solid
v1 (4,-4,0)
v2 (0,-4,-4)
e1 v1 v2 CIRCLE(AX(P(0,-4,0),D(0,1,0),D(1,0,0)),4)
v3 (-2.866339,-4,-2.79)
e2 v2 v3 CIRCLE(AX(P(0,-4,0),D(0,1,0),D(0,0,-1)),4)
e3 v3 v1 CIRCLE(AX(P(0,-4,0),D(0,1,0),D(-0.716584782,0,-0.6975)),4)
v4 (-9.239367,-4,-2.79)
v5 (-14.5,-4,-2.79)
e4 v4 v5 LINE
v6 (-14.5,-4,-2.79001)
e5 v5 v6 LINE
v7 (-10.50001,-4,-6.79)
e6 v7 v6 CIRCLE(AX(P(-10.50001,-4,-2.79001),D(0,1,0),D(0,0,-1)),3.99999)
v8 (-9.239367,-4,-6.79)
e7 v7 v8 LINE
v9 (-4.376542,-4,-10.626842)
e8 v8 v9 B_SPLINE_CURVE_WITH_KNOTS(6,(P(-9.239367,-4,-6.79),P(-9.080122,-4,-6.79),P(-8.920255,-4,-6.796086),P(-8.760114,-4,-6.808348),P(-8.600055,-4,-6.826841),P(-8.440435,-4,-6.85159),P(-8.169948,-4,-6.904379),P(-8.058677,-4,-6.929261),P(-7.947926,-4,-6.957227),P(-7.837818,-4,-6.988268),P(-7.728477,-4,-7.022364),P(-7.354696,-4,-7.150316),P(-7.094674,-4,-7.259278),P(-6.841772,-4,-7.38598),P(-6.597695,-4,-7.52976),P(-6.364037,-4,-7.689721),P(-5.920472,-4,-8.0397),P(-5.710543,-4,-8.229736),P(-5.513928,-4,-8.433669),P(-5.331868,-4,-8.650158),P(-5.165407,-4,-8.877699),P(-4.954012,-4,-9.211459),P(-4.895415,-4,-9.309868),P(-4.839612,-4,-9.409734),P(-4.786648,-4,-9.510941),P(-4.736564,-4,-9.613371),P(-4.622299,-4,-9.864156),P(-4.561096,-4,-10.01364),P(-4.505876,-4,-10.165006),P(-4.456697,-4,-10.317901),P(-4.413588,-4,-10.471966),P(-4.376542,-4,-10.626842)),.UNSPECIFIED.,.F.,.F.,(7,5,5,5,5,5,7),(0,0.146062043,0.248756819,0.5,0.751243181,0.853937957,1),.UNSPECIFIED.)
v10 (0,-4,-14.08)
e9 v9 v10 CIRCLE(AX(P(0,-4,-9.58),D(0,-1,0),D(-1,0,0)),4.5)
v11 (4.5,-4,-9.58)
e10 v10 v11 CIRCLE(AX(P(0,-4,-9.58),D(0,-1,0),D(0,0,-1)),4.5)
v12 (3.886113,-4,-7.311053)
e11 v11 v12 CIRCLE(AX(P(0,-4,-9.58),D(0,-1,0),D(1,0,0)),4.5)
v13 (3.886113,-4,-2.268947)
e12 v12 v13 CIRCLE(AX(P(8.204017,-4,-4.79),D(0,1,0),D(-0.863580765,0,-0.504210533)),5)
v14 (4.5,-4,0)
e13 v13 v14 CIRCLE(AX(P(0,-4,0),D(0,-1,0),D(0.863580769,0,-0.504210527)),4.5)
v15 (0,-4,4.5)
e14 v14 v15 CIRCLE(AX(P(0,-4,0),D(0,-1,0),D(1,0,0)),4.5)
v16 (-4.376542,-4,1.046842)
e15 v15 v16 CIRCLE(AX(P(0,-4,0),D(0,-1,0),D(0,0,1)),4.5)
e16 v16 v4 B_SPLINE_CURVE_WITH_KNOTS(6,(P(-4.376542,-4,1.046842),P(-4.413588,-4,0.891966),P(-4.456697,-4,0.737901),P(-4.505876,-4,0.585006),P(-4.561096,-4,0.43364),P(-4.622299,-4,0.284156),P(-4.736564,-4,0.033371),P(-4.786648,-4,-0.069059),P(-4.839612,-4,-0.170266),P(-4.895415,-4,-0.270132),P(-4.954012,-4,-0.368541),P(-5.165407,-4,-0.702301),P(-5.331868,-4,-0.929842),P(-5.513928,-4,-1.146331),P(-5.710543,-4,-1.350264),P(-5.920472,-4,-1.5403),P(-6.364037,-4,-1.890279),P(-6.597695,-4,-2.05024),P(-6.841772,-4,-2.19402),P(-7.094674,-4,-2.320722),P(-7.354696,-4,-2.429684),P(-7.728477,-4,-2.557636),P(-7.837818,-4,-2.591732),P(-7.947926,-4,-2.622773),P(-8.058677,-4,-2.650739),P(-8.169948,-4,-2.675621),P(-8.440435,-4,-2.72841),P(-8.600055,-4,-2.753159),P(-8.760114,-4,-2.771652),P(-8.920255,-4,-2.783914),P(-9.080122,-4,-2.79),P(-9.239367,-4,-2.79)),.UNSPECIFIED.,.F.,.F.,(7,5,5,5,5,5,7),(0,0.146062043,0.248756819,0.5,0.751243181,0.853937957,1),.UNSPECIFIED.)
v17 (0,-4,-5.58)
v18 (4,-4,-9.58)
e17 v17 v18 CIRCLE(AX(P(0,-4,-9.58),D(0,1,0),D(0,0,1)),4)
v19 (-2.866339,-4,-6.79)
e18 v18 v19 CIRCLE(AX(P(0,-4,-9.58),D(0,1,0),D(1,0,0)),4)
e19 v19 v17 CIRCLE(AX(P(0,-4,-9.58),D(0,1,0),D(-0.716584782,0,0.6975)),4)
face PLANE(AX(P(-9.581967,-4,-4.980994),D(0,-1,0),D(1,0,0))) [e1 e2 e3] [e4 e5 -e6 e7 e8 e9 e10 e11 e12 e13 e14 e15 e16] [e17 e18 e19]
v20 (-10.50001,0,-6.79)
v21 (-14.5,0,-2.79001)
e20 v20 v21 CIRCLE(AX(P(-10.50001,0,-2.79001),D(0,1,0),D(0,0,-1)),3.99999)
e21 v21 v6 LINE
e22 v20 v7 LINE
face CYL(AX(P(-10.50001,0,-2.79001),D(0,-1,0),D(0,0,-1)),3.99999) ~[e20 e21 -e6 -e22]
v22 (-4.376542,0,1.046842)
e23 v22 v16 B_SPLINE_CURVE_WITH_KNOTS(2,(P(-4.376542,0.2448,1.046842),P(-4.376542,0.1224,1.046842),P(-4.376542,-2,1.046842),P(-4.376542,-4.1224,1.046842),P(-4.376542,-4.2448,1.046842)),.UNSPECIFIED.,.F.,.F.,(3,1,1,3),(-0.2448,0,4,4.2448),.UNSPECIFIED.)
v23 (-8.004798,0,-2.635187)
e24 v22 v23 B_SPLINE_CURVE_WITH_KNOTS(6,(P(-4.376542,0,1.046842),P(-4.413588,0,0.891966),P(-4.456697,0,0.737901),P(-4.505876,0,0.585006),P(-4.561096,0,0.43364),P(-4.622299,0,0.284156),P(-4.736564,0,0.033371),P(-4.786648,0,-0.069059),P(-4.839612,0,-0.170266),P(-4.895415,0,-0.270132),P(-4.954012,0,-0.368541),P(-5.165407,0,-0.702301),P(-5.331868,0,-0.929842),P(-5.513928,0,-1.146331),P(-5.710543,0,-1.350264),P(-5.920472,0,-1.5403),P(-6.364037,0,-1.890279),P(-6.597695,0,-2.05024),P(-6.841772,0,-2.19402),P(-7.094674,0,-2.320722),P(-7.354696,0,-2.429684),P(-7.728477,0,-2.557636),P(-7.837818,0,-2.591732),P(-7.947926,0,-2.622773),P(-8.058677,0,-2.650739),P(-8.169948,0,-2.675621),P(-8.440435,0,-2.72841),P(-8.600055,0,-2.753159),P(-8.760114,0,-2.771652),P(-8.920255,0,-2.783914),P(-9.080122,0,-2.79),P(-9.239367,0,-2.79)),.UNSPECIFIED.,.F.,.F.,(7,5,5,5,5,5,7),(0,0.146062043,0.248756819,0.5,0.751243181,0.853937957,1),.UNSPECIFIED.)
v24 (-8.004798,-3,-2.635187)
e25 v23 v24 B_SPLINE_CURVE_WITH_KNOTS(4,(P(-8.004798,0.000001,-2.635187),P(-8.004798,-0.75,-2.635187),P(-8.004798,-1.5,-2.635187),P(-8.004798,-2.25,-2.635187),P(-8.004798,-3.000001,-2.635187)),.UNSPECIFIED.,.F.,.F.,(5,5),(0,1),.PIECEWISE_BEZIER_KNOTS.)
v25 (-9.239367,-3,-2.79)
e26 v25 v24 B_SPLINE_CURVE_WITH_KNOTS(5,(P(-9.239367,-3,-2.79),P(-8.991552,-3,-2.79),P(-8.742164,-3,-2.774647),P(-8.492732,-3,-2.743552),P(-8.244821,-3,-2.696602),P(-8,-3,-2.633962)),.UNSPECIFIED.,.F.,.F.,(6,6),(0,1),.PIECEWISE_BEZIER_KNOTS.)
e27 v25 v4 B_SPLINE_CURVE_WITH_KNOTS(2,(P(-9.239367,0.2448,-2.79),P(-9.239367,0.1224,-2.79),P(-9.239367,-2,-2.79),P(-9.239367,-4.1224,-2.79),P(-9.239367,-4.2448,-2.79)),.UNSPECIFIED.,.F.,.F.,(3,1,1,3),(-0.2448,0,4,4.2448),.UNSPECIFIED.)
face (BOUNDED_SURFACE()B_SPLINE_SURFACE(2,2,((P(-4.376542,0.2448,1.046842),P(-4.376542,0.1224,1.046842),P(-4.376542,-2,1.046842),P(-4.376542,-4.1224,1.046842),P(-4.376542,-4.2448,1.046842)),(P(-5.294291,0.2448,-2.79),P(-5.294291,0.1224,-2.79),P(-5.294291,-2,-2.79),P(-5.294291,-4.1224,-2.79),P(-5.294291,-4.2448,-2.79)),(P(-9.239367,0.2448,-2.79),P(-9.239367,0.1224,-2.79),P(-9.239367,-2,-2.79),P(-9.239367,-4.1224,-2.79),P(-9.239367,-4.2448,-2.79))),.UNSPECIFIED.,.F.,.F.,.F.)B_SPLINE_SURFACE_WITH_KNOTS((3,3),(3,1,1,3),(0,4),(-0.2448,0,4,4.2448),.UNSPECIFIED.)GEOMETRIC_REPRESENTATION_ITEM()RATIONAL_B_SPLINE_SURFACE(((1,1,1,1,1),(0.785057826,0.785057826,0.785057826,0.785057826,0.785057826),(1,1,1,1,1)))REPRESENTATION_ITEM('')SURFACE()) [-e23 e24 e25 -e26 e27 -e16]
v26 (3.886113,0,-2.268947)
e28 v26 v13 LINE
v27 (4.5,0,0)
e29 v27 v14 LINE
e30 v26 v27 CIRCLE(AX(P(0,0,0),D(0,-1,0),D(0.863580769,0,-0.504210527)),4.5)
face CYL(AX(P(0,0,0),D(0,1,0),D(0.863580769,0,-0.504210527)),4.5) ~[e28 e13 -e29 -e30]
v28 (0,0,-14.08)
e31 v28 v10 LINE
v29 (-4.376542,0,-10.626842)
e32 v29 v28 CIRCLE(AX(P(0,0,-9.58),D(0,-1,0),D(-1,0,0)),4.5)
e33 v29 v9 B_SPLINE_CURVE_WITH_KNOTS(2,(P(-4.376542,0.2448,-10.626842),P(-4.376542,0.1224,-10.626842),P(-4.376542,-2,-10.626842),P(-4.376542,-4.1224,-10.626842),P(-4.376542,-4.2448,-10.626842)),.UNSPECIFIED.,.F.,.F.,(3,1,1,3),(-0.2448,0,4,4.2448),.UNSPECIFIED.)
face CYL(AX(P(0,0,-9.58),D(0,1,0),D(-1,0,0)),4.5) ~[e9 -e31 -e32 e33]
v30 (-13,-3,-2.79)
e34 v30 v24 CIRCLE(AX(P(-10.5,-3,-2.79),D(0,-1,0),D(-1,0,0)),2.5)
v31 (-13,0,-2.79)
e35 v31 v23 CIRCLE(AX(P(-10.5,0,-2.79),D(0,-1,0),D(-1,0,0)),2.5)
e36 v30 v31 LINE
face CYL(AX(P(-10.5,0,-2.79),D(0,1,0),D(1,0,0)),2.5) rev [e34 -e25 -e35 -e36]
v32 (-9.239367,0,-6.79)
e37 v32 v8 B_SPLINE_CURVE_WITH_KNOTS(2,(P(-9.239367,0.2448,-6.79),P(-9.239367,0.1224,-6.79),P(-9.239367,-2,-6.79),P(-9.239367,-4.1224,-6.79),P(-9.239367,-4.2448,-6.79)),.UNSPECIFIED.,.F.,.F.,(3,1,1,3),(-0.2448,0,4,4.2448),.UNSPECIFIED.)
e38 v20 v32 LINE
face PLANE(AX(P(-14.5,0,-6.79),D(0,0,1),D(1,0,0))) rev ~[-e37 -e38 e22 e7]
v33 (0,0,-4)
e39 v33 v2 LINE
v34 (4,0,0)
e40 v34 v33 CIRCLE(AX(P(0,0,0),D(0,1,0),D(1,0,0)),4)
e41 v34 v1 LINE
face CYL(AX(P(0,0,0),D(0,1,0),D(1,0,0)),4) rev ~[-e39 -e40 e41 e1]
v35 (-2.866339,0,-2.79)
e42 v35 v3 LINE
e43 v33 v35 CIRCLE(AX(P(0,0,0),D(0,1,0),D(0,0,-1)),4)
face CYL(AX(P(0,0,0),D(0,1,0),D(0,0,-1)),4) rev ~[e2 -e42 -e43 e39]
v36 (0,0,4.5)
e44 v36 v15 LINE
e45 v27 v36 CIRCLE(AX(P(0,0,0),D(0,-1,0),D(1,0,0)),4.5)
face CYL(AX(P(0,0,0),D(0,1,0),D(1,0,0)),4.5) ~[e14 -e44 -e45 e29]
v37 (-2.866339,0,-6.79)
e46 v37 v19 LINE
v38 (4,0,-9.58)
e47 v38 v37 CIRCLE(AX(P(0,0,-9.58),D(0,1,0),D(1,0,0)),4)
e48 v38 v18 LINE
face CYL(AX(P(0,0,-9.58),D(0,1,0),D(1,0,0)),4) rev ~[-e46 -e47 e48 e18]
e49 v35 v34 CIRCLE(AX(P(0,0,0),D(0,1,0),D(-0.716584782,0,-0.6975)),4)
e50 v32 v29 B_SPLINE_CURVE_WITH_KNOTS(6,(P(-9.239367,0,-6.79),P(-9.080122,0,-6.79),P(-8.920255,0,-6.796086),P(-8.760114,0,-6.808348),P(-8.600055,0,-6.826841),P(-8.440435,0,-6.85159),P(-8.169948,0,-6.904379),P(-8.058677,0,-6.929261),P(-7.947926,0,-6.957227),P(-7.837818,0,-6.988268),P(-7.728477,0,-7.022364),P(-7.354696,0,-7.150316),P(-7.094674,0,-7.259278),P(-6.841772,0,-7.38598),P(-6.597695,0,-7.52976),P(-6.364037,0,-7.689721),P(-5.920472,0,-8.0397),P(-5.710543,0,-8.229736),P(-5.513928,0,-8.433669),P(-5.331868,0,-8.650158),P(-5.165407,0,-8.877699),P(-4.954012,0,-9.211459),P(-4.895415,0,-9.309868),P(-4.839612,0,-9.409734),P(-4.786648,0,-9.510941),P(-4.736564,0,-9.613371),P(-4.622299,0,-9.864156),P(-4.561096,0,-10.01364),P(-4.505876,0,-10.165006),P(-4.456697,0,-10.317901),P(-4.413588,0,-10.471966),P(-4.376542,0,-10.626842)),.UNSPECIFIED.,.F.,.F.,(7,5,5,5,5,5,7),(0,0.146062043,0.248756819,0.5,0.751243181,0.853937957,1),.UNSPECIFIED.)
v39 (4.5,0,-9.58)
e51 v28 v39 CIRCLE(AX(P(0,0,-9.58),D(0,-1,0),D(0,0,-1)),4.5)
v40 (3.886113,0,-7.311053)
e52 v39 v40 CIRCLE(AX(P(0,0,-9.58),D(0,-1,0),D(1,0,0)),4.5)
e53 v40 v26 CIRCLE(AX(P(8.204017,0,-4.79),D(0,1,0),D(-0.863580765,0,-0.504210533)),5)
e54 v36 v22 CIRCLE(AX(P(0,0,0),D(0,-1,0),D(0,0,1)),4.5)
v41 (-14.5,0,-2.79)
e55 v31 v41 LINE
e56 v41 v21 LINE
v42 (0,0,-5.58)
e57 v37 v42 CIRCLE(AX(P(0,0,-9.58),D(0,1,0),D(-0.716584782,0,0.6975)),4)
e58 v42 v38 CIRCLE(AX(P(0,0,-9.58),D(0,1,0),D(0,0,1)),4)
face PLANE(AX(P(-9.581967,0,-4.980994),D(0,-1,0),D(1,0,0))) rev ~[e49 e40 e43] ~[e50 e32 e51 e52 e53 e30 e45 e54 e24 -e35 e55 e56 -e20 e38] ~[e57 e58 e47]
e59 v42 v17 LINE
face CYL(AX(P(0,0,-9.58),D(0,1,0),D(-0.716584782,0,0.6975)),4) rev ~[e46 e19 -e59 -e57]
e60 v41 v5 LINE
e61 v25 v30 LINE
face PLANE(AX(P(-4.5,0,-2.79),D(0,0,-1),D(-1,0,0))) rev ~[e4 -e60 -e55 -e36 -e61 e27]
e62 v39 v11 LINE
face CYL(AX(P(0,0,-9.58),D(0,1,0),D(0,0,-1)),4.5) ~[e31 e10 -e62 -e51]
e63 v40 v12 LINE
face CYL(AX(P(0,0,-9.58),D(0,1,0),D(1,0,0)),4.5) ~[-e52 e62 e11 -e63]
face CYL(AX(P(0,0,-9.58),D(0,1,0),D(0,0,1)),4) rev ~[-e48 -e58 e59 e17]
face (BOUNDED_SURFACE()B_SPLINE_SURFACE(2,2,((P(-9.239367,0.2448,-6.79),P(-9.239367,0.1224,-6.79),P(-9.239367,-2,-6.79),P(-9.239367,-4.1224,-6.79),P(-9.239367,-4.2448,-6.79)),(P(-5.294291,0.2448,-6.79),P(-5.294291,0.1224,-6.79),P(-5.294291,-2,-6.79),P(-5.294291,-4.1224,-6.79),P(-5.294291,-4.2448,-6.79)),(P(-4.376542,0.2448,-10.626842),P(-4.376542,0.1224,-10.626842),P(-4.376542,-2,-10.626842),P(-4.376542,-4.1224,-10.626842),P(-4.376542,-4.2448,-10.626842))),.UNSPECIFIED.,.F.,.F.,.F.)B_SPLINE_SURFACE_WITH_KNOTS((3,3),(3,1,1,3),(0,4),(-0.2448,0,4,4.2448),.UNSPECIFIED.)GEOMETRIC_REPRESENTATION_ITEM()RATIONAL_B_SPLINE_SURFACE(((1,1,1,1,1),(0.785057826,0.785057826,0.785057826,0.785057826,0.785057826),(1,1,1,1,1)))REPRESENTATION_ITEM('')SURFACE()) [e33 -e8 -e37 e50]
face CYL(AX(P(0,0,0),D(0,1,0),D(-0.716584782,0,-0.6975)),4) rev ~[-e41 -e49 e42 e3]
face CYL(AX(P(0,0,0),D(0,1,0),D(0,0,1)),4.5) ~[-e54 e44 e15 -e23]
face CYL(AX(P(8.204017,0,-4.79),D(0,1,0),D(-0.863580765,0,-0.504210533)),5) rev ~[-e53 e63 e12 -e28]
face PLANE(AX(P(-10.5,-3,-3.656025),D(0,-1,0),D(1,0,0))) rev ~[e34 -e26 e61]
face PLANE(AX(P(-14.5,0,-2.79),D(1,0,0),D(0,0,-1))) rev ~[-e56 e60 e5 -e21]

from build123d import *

# Parameters (mm, degrees)
F1_DEPTH = 4
F2_R     = 5
F3_R     = 3.99999
F4_DEPTH = 3


# Not quite as in the source:
# - a fillet or chamfer is up to 0.001 mm smaller than in the source, because OpenCascade refuses the exact size
# - a feature names something its author has since deleted; it is built from what else it names


with BuildPart() as f1:
    # F0 (on Front) → F1 (new body)
    with BuildSketch(Plane.XZ):
        with BuildLine():
            Line((-4.5, -6.79), (-4.5, -2.79))
            Line((-4.5, -2.79), (-8, -2.79))
            ThreePointArc((-8, -2.79), (-10.5, -5.29), (-13, -2.79))
            Line((-13, -2.79), (-14.5, -2.79))
            Line((-14.5, -2.79), (-14.5, -6.79))
            Line((-14.5, -6.79), (-4.5, -6.79))
        make_face()
        with BuildLine():
            ThreePointArc((-13, -2.79), (-10.5, -5.29), (-8, -2.79))
            Line((-8, -2.79), (-13, -2.79))
        make_face()
        with BuildLine():
            Line((-3.5307081443, -2.79), (-4.5, -2.79))
            Line((-4.5, -2.79), (-4.5, -6.79))
            Line((-4.5, -6.79), (-3.5307081443, -6.79))
            ThreePointArc((-3.5307081443, -6.79), (-1.9615045246, -5.53), (0, -5.08))
            Line((0, -5.08), (0, -4.5))
            ThreePointArc((0, -4.5), (-1.9615045246, -4.05), (-3.5307081443, -2.79))
        make_face()
        with BuildLine():
            ThreePointArc((4.5, 0), (3.1819805153, 3.1819805153), (0, 4.5))
            ThreePointArc((0, 4.5), (-3.1819805153, 3.1819805153), (-4.5, 0))
            ThreePointArc((-4.5, 0), (-4.2507756145, -1.4767893131), (-3.5307081443, -2.79))
            Line((-3.5307081443, -2.79), (-2.8663391286, -2.79))
            ThreePointArc((-2.8663391286, -2.79), (-1.5057628442, 3.7057628442), (4, 0))
            ThreePointArc((4, 0), (2.8284271247, -2.8284271247), (0, -4))
            Line((0, -4), (0, -4.5))
            ThreePointArc((0, -4.5), (2.2405062847, -3.9025801194), (3.8861134595, -2.2689473726))
            ThreePointArc((3.8861134595, -2.2689473726), (4.3438180537, -1.1752636794), (4.5, 0))
        make_face()
        with BuildLine():
            Line((-2.8663391286, -2.79), (-3.5307081443, -2.79))
            ThreePointArc((-3.5307081443, -2.79), (-1.9615045246, -4.05), (0, -4.5))
            Line((0, -4.5), (0, -4))
            ThreePointArc((0, -4), (-1.5556349186, -3.6851051545), (-2.8663391286, -2.79))
        make_face()
        with BuildLine():
            ThreePointArc((0, -5.08), (-1.9615045246, -5.53), (-3.5307081443, -6.79))
            Line((-3.5307081443, -6.79), (-2.8663391286, -6.79))
            ThreePointArc((-2.8663391286, -6.79), (-1.5556349186, -5.8948948455), (0, -5.58))
            Line((0, -5.58), (0, -5.08))
        make_face()
        with BuildLine():
            ThreePointArc((4.5, -9.58), (4.3438180596, -8.4047363422), (3.886113482, -7.3110526659))
            ThreePointArc((3.886113482, -7.3110526659), (2.240506304, -5.6774198917), (0, -5.08))
            Line((0, -5.08), (0, -5.58))
            ThreePointArc((0, -5.58), (2.8284271247, -6.7515728753), (4, -9.58))
            ThreePointArc((4, -9.58), (-1.5057628442, -13.2857628442), (-2.8663391286, -6.79))
            Line((-2.8663391286, -6.79), (-3.5307081443, -6.79))
            ThreePointArc((-3.5307081443, -6.79), (-4.2507756145, -8.1032106869), (-4.5, -9.58))
            ThreePointArc((-4.5, -9.58), (-3.1819805153, -12.7619805153), (0, -14.08))
            ThreePointArc((0, -14.08), (3.1819805153, -12.7619805153), (4.5, -9.58))
        make_face()
        with BuildLine():
            Line((-3.5307081443, -6.79), (-4.5, -6.79))
            Line((-4.5, -6.79), (-4.5, -9.58))
            ThreePointArc((-4.5, -9.58), (-4.2507756145, -8.1032106869), (-3.5307081443, -6.79))
        make_face()
        with BuildLine():
            ThreePointArc((-3.5307081443, -2.79), (-4.2507756145, -1.4767893131), (-4.5, 0))
            Line((-4.5, 0), (-4.5, -2.79))
            Line((-4.5, -2.79), (-3.5307081443, -2.79))
        make_face()
        with BuildLine():
            ThreePointArc((3.886113482, -7.3110526659), (3.2040173086, -4.7900000223), (3.8861134595, -2.2689473726))
            ThreePointArc((3.8861134595, -2.2689473726), (2.2405062847, -3.9025801194), (0, -4.5))
            Line((0, -4.5), (0, -5.08))
            ThreePointArc((0, -5.08), (2.240506304, -5.6774198917), (3.886113482, -7.3110526659))
        make_face()
    extrude(amount=F1_DEPTH)

    # F2
    f2_edges = [f1.edges().sort_by_distance(p)[0] for p in [
        (-4.5, -2, -2.79),
        (-4.5, -2, -6.79),
    ]]
    fillet(f2_edges, radius=F2_R)

    # F3 (radius 4 in the source; OpenCascade refuses exactly that, so slightly less here)
    f3_edges = [f1.edges().sort_by_distance(p)[0] for p in [
        (-14.5, -2, -6.79),
    ]]
    fillet(f3_edges, radius=F3_R)

    # F0 (on Front) → F4 (cut)
    with BuildSketch(Plane.XZ):
        with BuildLine():
            ThreePointArc((-13, -2.79), (-10.5, -5.29), (-8, -2.79))
            Line((-8, -2.79), (-13, -2.79))
        make_face()
        with BuildLine():
            Line((-13, -2.79), (-8, -2.79))
            ThreePointArc((-8, -2.79), (-10.5, -0.29), (-13, -2.79))
        make_face()
    extrude(amount=F4_DEPTH, mode=Mode.SUBTRACT)


solid = f1.part
